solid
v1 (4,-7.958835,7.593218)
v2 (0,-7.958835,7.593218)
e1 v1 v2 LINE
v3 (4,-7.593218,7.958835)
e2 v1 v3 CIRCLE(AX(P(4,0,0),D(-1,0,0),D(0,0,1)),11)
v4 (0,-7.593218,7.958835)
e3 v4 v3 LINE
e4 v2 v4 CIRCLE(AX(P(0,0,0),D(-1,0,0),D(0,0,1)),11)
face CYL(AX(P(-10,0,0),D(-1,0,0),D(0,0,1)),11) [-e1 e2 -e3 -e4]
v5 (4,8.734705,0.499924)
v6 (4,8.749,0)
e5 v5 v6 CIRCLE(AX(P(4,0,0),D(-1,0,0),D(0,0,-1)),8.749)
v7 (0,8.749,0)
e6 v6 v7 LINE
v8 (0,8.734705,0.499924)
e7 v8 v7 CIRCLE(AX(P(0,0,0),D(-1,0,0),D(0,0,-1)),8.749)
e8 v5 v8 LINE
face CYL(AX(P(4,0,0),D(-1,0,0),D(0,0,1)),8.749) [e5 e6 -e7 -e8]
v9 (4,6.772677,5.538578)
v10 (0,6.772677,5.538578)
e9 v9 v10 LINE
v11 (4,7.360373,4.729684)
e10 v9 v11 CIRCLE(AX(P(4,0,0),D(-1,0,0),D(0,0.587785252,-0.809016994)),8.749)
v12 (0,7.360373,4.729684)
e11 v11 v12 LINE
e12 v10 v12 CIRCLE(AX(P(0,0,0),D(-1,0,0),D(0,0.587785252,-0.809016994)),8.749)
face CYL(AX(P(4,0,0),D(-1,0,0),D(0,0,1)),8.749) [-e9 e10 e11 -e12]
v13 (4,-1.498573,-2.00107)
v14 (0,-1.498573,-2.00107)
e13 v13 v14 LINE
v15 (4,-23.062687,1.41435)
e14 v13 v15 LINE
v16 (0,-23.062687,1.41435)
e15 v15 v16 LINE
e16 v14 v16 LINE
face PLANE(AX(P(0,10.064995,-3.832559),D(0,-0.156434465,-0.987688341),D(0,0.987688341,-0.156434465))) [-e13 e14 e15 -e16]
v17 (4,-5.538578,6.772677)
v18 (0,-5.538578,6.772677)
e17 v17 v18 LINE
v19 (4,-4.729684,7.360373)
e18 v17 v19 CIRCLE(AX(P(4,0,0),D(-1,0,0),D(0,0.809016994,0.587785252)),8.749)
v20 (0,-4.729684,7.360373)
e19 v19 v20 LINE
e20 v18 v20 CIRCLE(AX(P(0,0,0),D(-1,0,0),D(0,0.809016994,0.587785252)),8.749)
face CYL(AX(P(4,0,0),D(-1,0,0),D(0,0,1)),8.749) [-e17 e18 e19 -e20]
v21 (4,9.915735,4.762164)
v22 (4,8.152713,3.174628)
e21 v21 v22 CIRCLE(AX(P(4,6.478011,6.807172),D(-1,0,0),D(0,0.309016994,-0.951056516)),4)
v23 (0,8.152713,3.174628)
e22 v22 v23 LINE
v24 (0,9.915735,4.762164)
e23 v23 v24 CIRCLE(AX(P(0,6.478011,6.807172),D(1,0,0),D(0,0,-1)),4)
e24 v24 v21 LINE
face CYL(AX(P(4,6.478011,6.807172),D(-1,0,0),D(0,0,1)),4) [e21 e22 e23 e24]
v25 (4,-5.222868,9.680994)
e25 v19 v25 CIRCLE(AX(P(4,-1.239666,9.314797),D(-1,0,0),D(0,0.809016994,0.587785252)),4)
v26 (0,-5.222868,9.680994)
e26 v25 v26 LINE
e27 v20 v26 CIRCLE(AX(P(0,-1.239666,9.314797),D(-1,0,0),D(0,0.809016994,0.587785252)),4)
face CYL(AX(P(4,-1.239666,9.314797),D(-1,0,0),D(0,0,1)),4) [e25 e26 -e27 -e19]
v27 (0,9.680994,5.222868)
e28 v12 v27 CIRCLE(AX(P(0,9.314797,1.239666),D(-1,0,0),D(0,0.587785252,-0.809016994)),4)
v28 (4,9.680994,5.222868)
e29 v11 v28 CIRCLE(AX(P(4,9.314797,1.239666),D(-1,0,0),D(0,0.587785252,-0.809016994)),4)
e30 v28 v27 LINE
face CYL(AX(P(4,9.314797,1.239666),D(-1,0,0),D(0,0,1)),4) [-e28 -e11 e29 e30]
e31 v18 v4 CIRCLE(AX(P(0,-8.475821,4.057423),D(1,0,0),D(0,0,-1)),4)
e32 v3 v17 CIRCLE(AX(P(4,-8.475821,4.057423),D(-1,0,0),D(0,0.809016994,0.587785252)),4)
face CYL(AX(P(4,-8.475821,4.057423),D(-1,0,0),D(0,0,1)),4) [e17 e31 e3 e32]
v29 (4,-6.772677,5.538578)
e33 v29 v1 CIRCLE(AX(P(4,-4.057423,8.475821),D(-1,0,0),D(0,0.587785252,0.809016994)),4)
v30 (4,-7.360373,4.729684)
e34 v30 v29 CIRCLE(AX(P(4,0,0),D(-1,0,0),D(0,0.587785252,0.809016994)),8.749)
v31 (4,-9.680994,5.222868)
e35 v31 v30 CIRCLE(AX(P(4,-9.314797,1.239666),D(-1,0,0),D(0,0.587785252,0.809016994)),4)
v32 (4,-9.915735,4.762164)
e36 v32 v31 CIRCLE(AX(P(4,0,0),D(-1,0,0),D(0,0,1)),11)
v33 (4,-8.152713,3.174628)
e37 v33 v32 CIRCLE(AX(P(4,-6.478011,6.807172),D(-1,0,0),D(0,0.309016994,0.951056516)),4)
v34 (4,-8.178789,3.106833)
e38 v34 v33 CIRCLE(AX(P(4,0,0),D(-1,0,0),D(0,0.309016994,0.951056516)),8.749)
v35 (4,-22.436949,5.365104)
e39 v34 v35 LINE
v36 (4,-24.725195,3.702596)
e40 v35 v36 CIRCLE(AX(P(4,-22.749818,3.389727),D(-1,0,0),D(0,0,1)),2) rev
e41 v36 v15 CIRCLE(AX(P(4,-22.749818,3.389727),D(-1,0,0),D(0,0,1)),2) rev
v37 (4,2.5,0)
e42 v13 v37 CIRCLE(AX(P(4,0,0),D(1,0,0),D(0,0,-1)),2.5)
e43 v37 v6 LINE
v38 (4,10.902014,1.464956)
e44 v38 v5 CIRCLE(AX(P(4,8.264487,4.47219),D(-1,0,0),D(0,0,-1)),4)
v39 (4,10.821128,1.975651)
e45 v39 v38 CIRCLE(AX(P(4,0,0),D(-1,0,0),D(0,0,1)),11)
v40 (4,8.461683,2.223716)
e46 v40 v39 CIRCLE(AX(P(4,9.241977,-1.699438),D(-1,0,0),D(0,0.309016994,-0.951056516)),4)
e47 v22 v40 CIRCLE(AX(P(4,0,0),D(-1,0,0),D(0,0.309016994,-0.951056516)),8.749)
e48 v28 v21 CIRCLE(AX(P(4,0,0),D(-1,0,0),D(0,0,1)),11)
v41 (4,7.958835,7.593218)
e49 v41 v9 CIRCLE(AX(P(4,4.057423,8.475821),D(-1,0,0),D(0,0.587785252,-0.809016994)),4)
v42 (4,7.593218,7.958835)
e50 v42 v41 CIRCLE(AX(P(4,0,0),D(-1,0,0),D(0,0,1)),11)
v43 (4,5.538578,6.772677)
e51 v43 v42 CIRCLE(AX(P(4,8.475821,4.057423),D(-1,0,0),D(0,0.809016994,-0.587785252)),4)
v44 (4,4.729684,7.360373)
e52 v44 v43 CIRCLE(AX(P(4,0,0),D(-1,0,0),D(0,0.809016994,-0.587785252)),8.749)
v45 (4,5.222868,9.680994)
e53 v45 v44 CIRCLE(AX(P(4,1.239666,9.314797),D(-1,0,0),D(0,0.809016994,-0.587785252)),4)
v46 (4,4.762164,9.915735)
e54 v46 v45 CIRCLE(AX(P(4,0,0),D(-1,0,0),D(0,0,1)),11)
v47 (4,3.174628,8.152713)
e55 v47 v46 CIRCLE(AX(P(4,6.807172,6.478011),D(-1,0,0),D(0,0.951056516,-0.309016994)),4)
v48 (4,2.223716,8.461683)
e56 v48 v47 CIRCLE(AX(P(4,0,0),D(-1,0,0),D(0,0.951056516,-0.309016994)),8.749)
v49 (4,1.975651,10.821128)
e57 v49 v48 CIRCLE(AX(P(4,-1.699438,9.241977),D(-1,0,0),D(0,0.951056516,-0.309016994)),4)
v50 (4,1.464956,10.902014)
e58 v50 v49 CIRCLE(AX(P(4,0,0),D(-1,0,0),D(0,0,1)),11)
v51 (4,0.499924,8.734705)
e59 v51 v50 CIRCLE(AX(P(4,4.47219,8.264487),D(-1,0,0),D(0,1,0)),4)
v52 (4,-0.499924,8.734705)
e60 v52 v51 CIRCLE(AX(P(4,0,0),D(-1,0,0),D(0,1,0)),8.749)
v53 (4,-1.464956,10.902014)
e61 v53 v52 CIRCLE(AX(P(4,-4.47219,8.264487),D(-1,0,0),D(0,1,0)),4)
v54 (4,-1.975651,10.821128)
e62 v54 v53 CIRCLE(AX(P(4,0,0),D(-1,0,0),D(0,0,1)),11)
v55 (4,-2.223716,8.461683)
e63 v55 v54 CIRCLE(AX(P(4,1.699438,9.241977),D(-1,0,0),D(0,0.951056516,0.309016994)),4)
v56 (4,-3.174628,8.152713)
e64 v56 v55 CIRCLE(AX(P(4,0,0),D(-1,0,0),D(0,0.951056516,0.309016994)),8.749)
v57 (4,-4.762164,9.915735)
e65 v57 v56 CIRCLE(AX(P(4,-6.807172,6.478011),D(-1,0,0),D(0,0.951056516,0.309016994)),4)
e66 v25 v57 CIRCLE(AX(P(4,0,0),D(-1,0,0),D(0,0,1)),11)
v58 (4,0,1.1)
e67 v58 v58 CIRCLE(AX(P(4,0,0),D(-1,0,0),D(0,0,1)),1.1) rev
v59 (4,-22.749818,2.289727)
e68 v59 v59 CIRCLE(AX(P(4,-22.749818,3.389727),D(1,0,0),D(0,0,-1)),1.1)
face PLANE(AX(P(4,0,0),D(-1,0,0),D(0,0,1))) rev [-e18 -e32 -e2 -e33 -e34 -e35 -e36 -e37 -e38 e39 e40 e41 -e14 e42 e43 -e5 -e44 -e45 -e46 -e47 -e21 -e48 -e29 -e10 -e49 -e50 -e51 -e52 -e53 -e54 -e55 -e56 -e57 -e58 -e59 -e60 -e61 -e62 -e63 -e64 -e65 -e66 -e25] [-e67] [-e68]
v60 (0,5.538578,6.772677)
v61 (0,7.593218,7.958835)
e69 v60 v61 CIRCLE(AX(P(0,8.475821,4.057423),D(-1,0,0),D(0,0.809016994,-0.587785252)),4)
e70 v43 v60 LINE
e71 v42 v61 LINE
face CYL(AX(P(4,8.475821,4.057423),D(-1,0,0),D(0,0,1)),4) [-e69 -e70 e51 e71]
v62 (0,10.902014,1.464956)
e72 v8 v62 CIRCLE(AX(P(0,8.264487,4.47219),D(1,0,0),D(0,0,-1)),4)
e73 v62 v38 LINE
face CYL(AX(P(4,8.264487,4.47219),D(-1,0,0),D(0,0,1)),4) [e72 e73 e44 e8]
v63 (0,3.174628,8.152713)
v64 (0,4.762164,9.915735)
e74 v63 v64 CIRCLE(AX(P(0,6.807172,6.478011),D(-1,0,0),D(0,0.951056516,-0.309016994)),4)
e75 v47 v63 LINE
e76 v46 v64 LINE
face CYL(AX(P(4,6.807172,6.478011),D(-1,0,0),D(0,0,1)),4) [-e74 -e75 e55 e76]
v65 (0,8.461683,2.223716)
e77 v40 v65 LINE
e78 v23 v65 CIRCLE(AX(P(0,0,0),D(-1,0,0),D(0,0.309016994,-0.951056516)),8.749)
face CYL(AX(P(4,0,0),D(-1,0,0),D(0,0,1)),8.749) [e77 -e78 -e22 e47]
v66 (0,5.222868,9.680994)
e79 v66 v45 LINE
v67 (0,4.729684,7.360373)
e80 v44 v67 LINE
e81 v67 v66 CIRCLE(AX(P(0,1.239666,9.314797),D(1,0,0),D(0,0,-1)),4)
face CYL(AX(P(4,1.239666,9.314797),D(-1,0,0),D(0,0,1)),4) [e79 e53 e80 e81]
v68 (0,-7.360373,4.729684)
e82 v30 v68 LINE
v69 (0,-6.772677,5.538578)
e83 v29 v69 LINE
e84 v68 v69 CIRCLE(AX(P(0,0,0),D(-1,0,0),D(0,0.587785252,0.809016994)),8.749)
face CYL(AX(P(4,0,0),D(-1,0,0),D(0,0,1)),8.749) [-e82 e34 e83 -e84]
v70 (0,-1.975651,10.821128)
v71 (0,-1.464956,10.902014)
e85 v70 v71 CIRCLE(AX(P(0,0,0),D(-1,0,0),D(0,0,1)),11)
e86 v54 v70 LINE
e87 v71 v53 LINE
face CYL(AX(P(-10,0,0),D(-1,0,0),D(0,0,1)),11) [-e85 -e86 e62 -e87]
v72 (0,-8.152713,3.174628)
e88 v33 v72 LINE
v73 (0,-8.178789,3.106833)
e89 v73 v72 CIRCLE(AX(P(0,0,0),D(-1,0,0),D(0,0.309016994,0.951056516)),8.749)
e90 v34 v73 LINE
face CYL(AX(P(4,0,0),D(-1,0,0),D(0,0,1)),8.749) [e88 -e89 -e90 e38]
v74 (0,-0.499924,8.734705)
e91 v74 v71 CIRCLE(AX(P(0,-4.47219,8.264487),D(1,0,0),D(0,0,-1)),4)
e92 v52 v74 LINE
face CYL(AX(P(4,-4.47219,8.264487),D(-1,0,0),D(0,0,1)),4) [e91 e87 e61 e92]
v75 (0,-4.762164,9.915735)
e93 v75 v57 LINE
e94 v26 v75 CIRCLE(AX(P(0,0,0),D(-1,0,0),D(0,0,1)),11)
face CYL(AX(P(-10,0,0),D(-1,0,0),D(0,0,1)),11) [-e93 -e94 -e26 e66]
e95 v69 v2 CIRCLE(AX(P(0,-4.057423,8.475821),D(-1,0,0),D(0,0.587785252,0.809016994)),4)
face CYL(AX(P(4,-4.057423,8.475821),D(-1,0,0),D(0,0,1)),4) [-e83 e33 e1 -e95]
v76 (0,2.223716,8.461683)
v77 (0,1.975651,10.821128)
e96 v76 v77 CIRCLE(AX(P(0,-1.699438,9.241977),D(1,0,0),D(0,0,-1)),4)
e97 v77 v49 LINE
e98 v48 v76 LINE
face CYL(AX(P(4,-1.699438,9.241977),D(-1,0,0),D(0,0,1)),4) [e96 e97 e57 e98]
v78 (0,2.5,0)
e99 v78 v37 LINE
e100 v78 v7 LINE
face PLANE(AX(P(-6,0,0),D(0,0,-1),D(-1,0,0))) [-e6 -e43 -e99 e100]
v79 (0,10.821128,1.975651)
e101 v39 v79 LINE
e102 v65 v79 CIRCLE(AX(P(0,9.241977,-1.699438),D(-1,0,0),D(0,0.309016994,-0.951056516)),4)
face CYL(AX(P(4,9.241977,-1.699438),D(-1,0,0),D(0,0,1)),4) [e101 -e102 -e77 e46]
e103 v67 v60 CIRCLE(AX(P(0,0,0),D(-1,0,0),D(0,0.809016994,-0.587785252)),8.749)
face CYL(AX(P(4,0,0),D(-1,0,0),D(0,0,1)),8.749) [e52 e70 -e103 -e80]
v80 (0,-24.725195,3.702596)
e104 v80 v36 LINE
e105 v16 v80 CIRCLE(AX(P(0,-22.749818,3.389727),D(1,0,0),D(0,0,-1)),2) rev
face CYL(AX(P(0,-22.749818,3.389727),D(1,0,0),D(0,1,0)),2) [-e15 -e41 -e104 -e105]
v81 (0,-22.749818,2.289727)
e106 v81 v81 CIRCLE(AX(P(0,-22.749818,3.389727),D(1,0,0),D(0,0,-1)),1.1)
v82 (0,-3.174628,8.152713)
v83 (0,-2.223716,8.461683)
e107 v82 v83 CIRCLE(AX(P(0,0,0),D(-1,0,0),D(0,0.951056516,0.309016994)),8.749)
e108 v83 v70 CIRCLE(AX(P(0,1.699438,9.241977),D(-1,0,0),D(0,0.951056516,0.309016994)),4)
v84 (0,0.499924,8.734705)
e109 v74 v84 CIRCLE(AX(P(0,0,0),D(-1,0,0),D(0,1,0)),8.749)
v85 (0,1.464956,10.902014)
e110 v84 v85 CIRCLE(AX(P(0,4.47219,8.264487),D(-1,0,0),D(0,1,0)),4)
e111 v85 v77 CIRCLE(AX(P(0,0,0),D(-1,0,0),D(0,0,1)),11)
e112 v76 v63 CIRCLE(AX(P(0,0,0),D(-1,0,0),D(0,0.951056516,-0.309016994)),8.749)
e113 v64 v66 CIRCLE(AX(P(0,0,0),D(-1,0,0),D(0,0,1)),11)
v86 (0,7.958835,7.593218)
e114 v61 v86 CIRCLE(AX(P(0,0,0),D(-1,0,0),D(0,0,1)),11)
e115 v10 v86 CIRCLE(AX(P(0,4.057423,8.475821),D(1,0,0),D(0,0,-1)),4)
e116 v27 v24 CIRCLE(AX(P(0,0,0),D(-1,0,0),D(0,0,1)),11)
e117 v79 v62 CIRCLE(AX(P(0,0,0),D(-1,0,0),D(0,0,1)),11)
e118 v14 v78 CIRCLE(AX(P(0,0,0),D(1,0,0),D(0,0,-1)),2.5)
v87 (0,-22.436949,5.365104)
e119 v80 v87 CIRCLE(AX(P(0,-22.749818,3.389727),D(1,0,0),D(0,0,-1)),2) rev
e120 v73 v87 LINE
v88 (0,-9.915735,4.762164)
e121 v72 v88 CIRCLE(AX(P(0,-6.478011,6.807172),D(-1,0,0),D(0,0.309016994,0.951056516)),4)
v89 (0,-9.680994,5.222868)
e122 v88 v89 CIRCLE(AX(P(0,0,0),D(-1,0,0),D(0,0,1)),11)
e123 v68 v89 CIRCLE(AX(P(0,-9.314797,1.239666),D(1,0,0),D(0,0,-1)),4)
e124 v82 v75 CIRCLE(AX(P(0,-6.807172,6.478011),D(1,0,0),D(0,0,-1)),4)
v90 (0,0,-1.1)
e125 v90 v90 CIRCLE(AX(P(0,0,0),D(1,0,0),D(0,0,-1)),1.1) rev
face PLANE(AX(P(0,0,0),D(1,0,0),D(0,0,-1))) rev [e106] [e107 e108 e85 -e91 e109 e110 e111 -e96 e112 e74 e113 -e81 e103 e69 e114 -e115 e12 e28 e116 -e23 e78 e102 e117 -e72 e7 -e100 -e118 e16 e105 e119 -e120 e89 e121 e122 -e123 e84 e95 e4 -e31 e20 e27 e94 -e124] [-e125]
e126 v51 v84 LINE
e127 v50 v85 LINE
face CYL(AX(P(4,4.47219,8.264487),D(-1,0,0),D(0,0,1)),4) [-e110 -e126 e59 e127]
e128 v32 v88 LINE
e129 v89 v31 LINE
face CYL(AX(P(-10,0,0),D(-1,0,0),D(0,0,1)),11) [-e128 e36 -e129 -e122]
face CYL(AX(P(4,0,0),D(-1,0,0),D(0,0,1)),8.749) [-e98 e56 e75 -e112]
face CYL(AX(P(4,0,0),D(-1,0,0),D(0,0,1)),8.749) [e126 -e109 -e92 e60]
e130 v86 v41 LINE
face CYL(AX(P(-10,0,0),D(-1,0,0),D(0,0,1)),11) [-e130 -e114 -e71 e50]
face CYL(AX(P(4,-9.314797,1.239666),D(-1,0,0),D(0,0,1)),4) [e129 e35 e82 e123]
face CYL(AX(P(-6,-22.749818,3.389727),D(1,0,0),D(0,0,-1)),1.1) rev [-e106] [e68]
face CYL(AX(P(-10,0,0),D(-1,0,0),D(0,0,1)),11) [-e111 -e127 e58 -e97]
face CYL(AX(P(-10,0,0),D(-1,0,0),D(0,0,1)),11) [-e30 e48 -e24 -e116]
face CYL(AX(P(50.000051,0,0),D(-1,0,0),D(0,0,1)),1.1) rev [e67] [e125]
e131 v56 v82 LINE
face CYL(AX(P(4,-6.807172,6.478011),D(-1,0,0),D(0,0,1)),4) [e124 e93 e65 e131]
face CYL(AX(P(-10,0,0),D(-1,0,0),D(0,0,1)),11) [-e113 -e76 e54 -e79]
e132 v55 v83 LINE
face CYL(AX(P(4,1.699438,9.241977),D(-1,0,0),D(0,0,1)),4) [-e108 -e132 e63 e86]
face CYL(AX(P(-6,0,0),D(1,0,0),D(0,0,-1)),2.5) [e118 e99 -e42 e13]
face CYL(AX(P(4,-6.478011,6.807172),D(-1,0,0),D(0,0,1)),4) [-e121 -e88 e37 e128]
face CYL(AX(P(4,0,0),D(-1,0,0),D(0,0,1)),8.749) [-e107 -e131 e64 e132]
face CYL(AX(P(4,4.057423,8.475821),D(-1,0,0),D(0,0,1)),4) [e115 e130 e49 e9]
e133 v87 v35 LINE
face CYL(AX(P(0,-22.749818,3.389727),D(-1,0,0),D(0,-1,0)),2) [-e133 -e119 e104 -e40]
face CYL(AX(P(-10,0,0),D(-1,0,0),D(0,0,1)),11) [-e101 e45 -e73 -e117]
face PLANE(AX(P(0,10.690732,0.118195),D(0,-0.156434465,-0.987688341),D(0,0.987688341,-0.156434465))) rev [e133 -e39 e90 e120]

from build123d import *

# Parameters (mm, degrees)
BASPROSKE_W         = 4
BASPROSKE_H         = 11
TOOTHCUT_DEPTH      = 17.062378404
TEETHCUTS_COUNT     = 20
TEETHCUTS_ANGLE     = 342
BORSKE_R            = 1.1
BORE_DEPTH          = 50.0000508
CUT_EXTRUDE_1_DEPTH = 10
EXTRUDE_1_REACH     = 38.494
SKETCH_6_W          = 4
SKETCH_6_H          = 4
FILLET_1_R          = 2
SKETCH_7_R          = 1.1
CUT_EXTRUDE_2_DEPTH = 10


with BuildPart() as part:
    # BasProSke → Base-Revolve (revolve)
    with BuildSketch(Plane(origin=(0, 0, 0), x_dir=(1, 0, 0), z_dir=(0, 1, 0)), mode=Mode.PRIVATE) as base_revolve_sk:
        with Locations((2, 5.5)):
            Rectangle(BASPROSKE_W, BASPROSKE_H)
    revolve(base_revolve_sk.sketch.rotate(Axis((-10, 0, 0), (1, 0, 0)), 180), axis=Axis((-10, 0, 0), (1, 0, 0)))

    # TooCutSke → ToothCut (cut, through all)
    with BuildSketch(Plane(origin=(0, 0, 0), x_dir=(0, 0, -1), z_dir=(1, 0, 0))):
        with BuildLine():
            ThreePointArc((0.499924007, 8.734705318), (0, 8.749), (-0.499924007, 8.734705318))
            ThreePointArc((-0.499924007, 8.734705318), (-0.824302243, 9.905497836), (-1.485192705, 10.924909509))
            ThreePointArc((-1.485192705, 10.924909509), (0, 11.0254), (1.485192705, 10.924909509))
            ThreePointArc((1.485192705, 10.924909509), (0.824302243, 9.905497836), (0.499924007, 8.734705318))
        make_face()
    toothcut = extrude(amount=TOOTHCUT_DEPTH, mode=Mode.SUBTRACT)

    # TeethCuts: ToothCut ×20 about axis
    teethcuts_axis = Axis((-10, 0, 0), (1, 0, 0))
    for i in range(1, TEETHCUTS_COUNT):
        add(toothcut.rotate(teethcuts_axis, i * TEETHCUTS_ANGLE / (TEETHCUTS_COUNT - 1)), mode=Mode.SUBTRACT)

    # BorSke → Bore (cut, symmetric)
    with BuildSketch(Plane(origin=(0, 0, 0), x_dir=(0, 0, -1), z_dir=(1, 0, 0))):
        with Locations(Location((0, 0, 0), (0, 0, 180))):
            Circle(BORSKE_R)
    extrude(amount=BORE_DEPTH, both=True, mode=Mode.SUBTRACT)

    # 草图1 → 切除-拉伸1 (cut)
    with BuildSketch(Plane(origin=(4, 0, 0), x_dir=(0, 0, -1), z_dir=(1, 0, 0))):
        with BuildLine():
            Line((0, 12.401538845), (0, 2.5))
            ThreePointArc((0, 2.5), (1.767766953, 1.767766953), (2.5, 0))
            ThreePointArc((2.5, 0), (1.767766953, -1.767766953), (0, -2.5))
            Line((0, -2.5), (0, -15.030002789))
            Line((0, -15.030002789), (15.193341894, -15.030002789))
            Line((15.193341894, -15.030002789), (15.193341894, 12.401538845))
            Line((15.193341894, 12.401538845), (0, 12.401538845))
        make_face()
    extrude(amount=-CUT_EXTRUDE_1_DEPTH, mode=Mode.SUBTRACT)

    # 草图6 → 凸台-拉伸1 (add, up to next)
    with BuildSketch(Plane(origin=(0, -24.692208515, 3.910861626), x_dir=(0, -0.1564344650402271, -0.9876883405951383), z_dir=(0, -0.9876883405951383, 0.1564344650402271)), mode=Mode.PRIVATE) as extrude_1_sk1:
        with Locations((0.210861626, 2)):
            Rectangle(SKETCH_6_W, SKETCH_6_H)
    extrude_1_tool1 = extrude(extrude_1_sk1.sketch, amount=-EXTRUDE_1_REACH, mode=Mode.PRIVATE) - part.part
    add(extrude_1_tool1.solids().sort_by_distance((2, -24.725195, 3.702596))[0])

    # 圆角1
    fillet_1_edges = [part.edges().sort_by_distance(p)[0] for p in [
        (2, -24.41232561, 5.677972738),
        (2, -25.038063471, 1.727219375),
    ]]
    fillet(fillet_1_edges, radius=FILLET_1_R - 0.0001)  # a hair under: the kernel refuses the full size

    # 草图7 → 切除-拉伸2 (cut)
    with BuildSketch(Plane(origin=(4, 0, 0), x_dir=(0, 0, -1), z_dir=(1, 0, 0))):
        with Locations((-3.389727126, -22.749817859)):
            Circle(SKETCH_7_R)
    extrude(amount=-CUT_EXTRUDE_2_DEPTH, mode=Mode.SUBTRACT)


solid = part.part
